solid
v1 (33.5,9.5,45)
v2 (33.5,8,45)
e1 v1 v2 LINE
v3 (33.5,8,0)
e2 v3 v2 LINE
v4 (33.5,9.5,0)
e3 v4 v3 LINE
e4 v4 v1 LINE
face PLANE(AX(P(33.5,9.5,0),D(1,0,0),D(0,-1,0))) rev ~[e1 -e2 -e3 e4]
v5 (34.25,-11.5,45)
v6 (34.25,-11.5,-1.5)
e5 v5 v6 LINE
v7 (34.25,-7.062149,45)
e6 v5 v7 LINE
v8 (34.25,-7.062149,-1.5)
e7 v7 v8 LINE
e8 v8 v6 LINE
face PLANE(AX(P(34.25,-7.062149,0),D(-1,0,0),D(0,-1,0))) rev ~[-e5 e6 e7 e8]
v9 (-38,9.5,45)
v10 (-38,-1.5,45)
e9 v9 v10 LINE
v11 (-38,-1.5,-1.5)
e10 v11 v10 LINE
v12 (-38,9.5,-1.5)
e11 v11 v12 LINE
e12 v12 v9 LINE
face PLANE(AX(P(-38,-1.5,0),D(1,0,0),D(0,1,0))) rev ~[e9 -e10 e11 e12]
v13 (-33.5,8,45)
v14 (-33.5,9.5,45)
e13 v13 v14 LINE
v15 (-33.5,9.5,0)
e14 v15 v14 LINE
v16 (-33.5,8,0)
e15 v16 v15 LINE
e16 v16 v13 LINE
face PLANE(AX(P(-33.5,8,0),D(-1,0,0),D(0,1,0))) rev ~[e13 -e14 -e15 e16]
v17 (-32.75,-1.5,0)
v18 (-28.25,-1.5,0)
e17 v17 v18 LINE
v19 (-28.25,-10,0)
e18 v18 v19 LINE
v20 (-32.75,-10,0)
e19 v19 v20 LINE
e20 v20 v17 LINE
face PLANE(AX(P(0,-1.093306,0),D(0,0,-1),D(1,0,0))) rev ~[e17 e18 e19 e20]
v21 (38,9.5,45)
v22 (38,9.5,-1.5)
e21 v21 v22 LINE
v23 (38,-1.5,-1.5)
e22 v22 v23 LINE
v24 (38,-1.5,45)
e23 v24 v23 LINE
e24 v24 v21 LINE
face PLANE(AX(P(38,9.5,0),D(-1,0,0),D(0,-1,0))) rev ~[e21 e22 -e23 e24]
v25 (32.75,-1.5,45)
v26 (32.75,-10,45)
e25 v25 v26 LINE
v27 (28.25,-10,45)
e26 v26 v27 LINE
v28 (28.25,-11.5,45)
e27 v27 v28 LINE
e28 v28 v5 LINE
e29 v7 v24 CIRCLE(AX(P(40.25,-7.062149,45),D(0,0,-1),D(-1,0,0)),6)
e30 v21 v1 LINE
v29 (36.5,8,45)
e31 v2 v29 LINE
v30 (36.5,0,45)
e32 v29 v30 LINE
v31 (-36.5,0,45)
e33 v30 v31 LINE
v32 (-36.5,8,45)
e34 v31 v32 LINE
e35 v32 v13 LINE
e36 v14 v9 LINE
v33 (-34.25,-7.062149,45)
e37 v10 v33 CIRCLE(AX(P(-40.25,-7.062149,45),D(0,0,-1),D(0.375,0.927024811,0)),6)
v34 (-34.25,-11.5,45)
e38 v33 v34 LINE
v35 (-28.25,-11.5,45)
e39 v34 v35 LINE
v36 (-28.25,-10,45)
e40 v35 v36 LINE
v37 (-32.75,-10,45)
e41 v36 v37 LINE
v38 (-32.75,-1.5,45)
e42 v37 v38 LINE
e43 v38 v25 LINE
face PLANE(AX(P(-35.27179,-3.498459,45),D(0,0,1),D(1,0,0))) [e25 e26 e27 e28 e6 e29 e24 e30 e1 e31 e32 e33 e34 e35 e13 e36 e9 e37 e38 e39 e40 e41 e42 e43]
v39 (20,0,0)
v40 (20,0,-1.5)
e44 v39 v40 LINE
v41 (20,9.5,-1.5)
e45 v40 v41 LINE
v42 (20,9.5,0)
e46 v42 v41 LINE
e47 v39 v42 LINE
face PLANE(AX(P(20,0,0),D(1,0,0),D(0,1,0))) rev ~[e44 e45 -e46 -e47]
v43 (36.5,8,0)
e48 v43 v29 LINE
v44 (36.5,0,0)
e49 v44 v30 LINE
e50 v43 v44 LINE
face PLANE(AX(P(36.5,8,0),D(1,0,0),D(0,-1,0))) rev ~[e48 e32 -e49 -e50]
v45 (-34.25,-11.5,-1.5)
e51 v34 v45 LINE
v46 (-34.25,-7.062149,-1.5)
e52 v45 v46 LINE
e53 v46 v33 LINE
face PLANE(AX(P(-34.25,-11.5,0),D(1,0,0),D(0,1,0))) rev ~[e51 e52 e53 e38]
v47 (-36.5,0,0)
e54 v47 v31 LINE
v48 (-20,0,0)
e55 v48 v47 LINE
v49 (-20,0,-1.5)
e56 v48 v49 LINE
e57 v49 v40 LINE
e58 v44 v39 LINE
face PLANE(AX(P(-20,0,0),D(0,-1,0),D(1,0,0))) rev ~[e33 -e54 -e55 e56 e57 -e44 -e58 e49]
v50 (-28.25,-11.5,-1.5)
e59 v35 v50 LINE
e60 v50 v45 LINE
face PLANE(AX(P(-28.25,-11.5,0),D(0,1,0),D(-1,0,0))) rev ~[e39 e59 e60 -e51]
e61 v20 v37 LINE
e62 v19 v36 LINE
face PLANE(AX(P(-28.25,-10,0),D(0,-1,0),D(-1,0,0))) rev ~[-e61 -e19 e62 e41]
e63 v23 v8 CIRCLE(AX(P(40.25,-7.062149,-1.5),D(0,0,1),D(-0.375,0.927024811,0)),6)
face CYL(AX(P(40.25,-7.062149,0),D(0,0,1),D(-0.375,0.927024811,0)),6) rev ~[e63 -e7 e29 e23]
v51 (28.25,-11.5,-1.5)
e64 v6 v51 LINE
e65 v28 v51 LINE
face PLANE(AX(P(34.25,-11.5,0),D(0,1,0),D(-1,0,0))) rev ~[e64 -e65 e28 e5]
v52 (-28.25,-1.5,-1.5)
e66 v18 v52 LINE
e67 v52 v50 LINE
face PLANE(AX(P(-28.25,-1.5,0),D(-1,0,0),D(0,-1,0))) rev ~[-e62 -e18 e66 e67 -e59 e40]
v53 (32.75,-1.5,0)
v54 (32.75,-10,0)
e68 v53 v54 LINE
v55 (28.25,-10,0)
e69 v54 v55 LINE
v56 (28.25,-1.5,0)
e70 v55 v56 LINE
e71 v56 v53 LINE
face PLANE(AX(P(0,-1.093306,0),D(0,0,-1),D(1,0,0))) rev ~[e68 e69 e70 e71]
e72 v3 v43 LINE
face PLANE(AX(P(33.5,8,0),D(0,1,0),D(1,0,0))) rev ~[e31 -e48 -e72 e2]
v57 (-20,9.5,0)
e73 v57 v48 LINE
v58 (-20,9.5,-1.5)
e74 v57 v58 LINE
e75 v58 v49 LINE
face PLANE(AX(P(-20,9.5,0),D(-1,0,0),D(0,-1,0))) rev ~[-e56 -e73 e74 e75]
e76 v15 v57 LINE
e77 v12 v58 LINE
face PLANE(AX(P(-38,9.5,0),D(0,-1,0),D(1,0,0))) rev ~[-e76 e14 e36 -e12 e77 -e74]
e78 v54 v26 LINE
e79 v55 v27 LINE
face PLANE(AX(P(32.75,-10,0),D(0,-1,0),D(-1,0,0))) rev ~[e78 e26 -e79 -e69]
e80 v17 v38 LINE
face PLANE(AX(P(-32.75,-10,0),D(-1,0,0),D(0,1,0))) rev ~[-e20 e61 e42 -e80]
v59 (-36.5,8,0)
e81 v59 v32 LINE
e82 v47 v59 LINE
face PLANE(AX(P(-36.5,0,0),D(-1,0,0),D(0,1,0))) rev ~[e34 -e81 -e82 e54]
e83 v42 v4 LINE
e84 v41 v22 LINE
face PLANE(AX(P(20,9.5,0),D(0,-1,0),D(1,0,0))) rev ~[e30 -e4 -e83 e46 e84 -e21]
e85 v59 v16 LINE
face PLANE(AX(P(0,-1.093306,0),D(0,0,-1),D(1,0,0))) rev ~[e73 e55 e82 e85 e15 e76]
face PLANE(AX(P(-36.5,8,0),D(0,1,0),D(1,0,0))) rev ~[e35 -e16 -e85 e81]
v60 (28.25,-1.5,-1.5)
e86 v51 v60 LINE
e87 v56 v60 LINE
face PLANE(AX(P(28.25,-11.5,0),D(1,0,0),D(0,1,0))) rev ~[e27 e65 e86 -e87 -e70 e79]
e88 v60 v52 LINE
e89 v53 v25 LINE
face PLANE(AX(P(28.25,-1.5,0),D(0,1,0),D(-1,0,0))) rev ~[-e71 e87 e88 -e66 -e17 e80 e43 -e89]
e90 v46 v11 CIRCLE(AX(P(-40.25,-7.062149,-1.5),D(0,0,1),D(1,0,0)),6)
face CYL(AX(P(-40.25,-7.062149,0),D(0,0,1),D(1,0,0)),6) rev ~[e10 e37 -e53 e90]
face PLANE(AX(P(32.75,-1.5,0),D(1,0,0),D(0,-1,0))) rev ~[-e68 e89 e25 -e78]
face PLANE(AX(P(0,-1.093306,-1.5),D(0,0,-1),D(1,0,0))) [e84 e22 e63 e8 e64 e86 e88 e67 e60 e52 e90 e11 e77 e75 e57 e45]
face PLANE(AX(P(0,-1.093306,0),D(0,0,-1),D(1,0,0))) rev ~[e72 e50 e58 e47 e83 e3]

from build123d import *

# Parameters (mm, degrees)
F1_DEPTH    = 45
F2_T1_DEPTH = 45
F3_W        = 4.5
F3_H        = 8.5
F4_DEPTH    = 1.5


# Not quite as in the source:
# - a fillet or chamfer that OpenCascade refuses, or shapes differently, is made with other operations: its cross-section is extruded or revolved along the edge and cut away or added


with BuildPart() as f1:
    # F0 (on Top) → F1 (new body)
    with BuildSketch(Plane.XY):
        Polygon((36.5, 0), (0, 0), (-36.5, 0), (-36.5, 8), (-33.5, 8), (-33.5, 9.5), (-38, 9.5), (-38, -1.5), (-34.25, -1.5), (-32.75, -1.5), (0, -1.5), (32.75, -1.5), (34.25, -1.5), (38, -1.5), (38, 9.5), (33.5, 9.5), (33.5, 8), (36.5, 8), align=None)
        Polygon((-32.75, -1.5), (-34.25, -1.5), (-34.25, -11.5), (-28.25, -11.5), (-28.25, -10), (-32.75, -10), align=None)
        Polygon((34.25, -11.5), (34.25, -1.5), (32.75, -1.5), (32.75, -10), (28.25, -10), (28.25, -11.5), align=None)
    extrude(amount=F1_DEPTH)

    # F2: fillet of radius 6 on 2 edges, made by hand

    # F2_s2 → F2_t1 (join)
    with BuildSketch(Plane.XY):
        with BuildLine():
            ThreePointArc((-38, -1.5), (-35.2750628145, -3.7080468991), (-34.25, -7.0621488653))
            Line((-34.25, -7.0621488653), (-34.25, -1.5))
            Line((-34.25, -1.5), (-38, -1.5))
        make_face()
        with BuildLine():
            ThreePointArc((34.25, -7.0621488653), (35.2750628145, -3.7080468991), (38, -1.5))
            Line((38, -1.5), (34.25, -1.5))
            Line((34.25, -1.5), (34.25, -7.0621488653))
        make_face()
    extrude(amount=F2_T1_DEPTH)

    # F3 (on face) → F4 (join)
    with BuildSketch(Plane(origin=(0, 0, 0), x_dir=(1, 0, 0), z_dir=(0, 0, -1))):
        with BuildLine():
            Line((-38, -9.5), (-33.5, -9.5))
            Line((-33.5, -9.5), (-33.5, -8))
            Line((-33.5, -8), (-36.5, -8))
            Line((-36.5, -8), (-36.5, 0))
            Line((-36.5, 0), (-20, 0))
            Line((-20, 0), (20, 0))
            Line((20, 0), (36.5, 0))
            Line((36.5, 0), (36.5, -8))
            Line((36.5, -8), (33.5, -8))
            Line((33.5, -8), (33.5, -9.5))
            Line((33.5, -9.5), (38, -9.5))
            Line((38, -9.5), (38, 1.5))
            ThreePointArc((38, 1.5), (35.2750628145, 3.7080468991), (34.25, 7.0621488653))
            Line((34.25, 7.0621488653), (34.25, 11.5))
            Line((34.25, 11.5), (28.25, 11.5))
            Line((28.25, 11.5), (28.25, 10))
            Line((28.25, 10), (32.75, 10))
            Line((32.75, 10), (32.75, 1.5))
            Line((32.75, 1.5), (28.25, 1.5))
            Line((28.25, 1.5), (-28.25, 1.5))
            Line((-28.25, 1.5), (-32.75, 1.5))
            Line((-32.75, 1.5), (-32.75, 10))
            Line((-32.75, 10), (-28.25, 10))
            Line((-28.25, 10), (-28.25, 11.5))
            Line((-28.25, 11.5), (-34.25, 11.5))
            Line((-34.25, 11.5), (-34.25, 7.0621488653))
            ThreePointArc((-34.25, 7.0621488653), (-35.2750628145, 3.7080468991), (-38, 1.5))
            Line((-38, 1.5), (-38, -9.5))
        make_face()
        with Locations((-30.5, 5.75)):
            Rectangle(F3_W, F3_H)
        Polygon((-33.5, -8), (-33.5, -9.5), (-20, -9.5), (-20, 0), (-36.5, 0), (-36.5, -8), align=None)
        Polygon((36.5, 0), (20, 0), (20, -9.5), (33.5, -9.5), (33.5, -8), (36.5, -8), align=None)
        with Locations((30.5, 5.75)):
            Rectangle(F3_W, F3_H)
    extrude(amount=F4_DEPTH)


solid = f1.part
